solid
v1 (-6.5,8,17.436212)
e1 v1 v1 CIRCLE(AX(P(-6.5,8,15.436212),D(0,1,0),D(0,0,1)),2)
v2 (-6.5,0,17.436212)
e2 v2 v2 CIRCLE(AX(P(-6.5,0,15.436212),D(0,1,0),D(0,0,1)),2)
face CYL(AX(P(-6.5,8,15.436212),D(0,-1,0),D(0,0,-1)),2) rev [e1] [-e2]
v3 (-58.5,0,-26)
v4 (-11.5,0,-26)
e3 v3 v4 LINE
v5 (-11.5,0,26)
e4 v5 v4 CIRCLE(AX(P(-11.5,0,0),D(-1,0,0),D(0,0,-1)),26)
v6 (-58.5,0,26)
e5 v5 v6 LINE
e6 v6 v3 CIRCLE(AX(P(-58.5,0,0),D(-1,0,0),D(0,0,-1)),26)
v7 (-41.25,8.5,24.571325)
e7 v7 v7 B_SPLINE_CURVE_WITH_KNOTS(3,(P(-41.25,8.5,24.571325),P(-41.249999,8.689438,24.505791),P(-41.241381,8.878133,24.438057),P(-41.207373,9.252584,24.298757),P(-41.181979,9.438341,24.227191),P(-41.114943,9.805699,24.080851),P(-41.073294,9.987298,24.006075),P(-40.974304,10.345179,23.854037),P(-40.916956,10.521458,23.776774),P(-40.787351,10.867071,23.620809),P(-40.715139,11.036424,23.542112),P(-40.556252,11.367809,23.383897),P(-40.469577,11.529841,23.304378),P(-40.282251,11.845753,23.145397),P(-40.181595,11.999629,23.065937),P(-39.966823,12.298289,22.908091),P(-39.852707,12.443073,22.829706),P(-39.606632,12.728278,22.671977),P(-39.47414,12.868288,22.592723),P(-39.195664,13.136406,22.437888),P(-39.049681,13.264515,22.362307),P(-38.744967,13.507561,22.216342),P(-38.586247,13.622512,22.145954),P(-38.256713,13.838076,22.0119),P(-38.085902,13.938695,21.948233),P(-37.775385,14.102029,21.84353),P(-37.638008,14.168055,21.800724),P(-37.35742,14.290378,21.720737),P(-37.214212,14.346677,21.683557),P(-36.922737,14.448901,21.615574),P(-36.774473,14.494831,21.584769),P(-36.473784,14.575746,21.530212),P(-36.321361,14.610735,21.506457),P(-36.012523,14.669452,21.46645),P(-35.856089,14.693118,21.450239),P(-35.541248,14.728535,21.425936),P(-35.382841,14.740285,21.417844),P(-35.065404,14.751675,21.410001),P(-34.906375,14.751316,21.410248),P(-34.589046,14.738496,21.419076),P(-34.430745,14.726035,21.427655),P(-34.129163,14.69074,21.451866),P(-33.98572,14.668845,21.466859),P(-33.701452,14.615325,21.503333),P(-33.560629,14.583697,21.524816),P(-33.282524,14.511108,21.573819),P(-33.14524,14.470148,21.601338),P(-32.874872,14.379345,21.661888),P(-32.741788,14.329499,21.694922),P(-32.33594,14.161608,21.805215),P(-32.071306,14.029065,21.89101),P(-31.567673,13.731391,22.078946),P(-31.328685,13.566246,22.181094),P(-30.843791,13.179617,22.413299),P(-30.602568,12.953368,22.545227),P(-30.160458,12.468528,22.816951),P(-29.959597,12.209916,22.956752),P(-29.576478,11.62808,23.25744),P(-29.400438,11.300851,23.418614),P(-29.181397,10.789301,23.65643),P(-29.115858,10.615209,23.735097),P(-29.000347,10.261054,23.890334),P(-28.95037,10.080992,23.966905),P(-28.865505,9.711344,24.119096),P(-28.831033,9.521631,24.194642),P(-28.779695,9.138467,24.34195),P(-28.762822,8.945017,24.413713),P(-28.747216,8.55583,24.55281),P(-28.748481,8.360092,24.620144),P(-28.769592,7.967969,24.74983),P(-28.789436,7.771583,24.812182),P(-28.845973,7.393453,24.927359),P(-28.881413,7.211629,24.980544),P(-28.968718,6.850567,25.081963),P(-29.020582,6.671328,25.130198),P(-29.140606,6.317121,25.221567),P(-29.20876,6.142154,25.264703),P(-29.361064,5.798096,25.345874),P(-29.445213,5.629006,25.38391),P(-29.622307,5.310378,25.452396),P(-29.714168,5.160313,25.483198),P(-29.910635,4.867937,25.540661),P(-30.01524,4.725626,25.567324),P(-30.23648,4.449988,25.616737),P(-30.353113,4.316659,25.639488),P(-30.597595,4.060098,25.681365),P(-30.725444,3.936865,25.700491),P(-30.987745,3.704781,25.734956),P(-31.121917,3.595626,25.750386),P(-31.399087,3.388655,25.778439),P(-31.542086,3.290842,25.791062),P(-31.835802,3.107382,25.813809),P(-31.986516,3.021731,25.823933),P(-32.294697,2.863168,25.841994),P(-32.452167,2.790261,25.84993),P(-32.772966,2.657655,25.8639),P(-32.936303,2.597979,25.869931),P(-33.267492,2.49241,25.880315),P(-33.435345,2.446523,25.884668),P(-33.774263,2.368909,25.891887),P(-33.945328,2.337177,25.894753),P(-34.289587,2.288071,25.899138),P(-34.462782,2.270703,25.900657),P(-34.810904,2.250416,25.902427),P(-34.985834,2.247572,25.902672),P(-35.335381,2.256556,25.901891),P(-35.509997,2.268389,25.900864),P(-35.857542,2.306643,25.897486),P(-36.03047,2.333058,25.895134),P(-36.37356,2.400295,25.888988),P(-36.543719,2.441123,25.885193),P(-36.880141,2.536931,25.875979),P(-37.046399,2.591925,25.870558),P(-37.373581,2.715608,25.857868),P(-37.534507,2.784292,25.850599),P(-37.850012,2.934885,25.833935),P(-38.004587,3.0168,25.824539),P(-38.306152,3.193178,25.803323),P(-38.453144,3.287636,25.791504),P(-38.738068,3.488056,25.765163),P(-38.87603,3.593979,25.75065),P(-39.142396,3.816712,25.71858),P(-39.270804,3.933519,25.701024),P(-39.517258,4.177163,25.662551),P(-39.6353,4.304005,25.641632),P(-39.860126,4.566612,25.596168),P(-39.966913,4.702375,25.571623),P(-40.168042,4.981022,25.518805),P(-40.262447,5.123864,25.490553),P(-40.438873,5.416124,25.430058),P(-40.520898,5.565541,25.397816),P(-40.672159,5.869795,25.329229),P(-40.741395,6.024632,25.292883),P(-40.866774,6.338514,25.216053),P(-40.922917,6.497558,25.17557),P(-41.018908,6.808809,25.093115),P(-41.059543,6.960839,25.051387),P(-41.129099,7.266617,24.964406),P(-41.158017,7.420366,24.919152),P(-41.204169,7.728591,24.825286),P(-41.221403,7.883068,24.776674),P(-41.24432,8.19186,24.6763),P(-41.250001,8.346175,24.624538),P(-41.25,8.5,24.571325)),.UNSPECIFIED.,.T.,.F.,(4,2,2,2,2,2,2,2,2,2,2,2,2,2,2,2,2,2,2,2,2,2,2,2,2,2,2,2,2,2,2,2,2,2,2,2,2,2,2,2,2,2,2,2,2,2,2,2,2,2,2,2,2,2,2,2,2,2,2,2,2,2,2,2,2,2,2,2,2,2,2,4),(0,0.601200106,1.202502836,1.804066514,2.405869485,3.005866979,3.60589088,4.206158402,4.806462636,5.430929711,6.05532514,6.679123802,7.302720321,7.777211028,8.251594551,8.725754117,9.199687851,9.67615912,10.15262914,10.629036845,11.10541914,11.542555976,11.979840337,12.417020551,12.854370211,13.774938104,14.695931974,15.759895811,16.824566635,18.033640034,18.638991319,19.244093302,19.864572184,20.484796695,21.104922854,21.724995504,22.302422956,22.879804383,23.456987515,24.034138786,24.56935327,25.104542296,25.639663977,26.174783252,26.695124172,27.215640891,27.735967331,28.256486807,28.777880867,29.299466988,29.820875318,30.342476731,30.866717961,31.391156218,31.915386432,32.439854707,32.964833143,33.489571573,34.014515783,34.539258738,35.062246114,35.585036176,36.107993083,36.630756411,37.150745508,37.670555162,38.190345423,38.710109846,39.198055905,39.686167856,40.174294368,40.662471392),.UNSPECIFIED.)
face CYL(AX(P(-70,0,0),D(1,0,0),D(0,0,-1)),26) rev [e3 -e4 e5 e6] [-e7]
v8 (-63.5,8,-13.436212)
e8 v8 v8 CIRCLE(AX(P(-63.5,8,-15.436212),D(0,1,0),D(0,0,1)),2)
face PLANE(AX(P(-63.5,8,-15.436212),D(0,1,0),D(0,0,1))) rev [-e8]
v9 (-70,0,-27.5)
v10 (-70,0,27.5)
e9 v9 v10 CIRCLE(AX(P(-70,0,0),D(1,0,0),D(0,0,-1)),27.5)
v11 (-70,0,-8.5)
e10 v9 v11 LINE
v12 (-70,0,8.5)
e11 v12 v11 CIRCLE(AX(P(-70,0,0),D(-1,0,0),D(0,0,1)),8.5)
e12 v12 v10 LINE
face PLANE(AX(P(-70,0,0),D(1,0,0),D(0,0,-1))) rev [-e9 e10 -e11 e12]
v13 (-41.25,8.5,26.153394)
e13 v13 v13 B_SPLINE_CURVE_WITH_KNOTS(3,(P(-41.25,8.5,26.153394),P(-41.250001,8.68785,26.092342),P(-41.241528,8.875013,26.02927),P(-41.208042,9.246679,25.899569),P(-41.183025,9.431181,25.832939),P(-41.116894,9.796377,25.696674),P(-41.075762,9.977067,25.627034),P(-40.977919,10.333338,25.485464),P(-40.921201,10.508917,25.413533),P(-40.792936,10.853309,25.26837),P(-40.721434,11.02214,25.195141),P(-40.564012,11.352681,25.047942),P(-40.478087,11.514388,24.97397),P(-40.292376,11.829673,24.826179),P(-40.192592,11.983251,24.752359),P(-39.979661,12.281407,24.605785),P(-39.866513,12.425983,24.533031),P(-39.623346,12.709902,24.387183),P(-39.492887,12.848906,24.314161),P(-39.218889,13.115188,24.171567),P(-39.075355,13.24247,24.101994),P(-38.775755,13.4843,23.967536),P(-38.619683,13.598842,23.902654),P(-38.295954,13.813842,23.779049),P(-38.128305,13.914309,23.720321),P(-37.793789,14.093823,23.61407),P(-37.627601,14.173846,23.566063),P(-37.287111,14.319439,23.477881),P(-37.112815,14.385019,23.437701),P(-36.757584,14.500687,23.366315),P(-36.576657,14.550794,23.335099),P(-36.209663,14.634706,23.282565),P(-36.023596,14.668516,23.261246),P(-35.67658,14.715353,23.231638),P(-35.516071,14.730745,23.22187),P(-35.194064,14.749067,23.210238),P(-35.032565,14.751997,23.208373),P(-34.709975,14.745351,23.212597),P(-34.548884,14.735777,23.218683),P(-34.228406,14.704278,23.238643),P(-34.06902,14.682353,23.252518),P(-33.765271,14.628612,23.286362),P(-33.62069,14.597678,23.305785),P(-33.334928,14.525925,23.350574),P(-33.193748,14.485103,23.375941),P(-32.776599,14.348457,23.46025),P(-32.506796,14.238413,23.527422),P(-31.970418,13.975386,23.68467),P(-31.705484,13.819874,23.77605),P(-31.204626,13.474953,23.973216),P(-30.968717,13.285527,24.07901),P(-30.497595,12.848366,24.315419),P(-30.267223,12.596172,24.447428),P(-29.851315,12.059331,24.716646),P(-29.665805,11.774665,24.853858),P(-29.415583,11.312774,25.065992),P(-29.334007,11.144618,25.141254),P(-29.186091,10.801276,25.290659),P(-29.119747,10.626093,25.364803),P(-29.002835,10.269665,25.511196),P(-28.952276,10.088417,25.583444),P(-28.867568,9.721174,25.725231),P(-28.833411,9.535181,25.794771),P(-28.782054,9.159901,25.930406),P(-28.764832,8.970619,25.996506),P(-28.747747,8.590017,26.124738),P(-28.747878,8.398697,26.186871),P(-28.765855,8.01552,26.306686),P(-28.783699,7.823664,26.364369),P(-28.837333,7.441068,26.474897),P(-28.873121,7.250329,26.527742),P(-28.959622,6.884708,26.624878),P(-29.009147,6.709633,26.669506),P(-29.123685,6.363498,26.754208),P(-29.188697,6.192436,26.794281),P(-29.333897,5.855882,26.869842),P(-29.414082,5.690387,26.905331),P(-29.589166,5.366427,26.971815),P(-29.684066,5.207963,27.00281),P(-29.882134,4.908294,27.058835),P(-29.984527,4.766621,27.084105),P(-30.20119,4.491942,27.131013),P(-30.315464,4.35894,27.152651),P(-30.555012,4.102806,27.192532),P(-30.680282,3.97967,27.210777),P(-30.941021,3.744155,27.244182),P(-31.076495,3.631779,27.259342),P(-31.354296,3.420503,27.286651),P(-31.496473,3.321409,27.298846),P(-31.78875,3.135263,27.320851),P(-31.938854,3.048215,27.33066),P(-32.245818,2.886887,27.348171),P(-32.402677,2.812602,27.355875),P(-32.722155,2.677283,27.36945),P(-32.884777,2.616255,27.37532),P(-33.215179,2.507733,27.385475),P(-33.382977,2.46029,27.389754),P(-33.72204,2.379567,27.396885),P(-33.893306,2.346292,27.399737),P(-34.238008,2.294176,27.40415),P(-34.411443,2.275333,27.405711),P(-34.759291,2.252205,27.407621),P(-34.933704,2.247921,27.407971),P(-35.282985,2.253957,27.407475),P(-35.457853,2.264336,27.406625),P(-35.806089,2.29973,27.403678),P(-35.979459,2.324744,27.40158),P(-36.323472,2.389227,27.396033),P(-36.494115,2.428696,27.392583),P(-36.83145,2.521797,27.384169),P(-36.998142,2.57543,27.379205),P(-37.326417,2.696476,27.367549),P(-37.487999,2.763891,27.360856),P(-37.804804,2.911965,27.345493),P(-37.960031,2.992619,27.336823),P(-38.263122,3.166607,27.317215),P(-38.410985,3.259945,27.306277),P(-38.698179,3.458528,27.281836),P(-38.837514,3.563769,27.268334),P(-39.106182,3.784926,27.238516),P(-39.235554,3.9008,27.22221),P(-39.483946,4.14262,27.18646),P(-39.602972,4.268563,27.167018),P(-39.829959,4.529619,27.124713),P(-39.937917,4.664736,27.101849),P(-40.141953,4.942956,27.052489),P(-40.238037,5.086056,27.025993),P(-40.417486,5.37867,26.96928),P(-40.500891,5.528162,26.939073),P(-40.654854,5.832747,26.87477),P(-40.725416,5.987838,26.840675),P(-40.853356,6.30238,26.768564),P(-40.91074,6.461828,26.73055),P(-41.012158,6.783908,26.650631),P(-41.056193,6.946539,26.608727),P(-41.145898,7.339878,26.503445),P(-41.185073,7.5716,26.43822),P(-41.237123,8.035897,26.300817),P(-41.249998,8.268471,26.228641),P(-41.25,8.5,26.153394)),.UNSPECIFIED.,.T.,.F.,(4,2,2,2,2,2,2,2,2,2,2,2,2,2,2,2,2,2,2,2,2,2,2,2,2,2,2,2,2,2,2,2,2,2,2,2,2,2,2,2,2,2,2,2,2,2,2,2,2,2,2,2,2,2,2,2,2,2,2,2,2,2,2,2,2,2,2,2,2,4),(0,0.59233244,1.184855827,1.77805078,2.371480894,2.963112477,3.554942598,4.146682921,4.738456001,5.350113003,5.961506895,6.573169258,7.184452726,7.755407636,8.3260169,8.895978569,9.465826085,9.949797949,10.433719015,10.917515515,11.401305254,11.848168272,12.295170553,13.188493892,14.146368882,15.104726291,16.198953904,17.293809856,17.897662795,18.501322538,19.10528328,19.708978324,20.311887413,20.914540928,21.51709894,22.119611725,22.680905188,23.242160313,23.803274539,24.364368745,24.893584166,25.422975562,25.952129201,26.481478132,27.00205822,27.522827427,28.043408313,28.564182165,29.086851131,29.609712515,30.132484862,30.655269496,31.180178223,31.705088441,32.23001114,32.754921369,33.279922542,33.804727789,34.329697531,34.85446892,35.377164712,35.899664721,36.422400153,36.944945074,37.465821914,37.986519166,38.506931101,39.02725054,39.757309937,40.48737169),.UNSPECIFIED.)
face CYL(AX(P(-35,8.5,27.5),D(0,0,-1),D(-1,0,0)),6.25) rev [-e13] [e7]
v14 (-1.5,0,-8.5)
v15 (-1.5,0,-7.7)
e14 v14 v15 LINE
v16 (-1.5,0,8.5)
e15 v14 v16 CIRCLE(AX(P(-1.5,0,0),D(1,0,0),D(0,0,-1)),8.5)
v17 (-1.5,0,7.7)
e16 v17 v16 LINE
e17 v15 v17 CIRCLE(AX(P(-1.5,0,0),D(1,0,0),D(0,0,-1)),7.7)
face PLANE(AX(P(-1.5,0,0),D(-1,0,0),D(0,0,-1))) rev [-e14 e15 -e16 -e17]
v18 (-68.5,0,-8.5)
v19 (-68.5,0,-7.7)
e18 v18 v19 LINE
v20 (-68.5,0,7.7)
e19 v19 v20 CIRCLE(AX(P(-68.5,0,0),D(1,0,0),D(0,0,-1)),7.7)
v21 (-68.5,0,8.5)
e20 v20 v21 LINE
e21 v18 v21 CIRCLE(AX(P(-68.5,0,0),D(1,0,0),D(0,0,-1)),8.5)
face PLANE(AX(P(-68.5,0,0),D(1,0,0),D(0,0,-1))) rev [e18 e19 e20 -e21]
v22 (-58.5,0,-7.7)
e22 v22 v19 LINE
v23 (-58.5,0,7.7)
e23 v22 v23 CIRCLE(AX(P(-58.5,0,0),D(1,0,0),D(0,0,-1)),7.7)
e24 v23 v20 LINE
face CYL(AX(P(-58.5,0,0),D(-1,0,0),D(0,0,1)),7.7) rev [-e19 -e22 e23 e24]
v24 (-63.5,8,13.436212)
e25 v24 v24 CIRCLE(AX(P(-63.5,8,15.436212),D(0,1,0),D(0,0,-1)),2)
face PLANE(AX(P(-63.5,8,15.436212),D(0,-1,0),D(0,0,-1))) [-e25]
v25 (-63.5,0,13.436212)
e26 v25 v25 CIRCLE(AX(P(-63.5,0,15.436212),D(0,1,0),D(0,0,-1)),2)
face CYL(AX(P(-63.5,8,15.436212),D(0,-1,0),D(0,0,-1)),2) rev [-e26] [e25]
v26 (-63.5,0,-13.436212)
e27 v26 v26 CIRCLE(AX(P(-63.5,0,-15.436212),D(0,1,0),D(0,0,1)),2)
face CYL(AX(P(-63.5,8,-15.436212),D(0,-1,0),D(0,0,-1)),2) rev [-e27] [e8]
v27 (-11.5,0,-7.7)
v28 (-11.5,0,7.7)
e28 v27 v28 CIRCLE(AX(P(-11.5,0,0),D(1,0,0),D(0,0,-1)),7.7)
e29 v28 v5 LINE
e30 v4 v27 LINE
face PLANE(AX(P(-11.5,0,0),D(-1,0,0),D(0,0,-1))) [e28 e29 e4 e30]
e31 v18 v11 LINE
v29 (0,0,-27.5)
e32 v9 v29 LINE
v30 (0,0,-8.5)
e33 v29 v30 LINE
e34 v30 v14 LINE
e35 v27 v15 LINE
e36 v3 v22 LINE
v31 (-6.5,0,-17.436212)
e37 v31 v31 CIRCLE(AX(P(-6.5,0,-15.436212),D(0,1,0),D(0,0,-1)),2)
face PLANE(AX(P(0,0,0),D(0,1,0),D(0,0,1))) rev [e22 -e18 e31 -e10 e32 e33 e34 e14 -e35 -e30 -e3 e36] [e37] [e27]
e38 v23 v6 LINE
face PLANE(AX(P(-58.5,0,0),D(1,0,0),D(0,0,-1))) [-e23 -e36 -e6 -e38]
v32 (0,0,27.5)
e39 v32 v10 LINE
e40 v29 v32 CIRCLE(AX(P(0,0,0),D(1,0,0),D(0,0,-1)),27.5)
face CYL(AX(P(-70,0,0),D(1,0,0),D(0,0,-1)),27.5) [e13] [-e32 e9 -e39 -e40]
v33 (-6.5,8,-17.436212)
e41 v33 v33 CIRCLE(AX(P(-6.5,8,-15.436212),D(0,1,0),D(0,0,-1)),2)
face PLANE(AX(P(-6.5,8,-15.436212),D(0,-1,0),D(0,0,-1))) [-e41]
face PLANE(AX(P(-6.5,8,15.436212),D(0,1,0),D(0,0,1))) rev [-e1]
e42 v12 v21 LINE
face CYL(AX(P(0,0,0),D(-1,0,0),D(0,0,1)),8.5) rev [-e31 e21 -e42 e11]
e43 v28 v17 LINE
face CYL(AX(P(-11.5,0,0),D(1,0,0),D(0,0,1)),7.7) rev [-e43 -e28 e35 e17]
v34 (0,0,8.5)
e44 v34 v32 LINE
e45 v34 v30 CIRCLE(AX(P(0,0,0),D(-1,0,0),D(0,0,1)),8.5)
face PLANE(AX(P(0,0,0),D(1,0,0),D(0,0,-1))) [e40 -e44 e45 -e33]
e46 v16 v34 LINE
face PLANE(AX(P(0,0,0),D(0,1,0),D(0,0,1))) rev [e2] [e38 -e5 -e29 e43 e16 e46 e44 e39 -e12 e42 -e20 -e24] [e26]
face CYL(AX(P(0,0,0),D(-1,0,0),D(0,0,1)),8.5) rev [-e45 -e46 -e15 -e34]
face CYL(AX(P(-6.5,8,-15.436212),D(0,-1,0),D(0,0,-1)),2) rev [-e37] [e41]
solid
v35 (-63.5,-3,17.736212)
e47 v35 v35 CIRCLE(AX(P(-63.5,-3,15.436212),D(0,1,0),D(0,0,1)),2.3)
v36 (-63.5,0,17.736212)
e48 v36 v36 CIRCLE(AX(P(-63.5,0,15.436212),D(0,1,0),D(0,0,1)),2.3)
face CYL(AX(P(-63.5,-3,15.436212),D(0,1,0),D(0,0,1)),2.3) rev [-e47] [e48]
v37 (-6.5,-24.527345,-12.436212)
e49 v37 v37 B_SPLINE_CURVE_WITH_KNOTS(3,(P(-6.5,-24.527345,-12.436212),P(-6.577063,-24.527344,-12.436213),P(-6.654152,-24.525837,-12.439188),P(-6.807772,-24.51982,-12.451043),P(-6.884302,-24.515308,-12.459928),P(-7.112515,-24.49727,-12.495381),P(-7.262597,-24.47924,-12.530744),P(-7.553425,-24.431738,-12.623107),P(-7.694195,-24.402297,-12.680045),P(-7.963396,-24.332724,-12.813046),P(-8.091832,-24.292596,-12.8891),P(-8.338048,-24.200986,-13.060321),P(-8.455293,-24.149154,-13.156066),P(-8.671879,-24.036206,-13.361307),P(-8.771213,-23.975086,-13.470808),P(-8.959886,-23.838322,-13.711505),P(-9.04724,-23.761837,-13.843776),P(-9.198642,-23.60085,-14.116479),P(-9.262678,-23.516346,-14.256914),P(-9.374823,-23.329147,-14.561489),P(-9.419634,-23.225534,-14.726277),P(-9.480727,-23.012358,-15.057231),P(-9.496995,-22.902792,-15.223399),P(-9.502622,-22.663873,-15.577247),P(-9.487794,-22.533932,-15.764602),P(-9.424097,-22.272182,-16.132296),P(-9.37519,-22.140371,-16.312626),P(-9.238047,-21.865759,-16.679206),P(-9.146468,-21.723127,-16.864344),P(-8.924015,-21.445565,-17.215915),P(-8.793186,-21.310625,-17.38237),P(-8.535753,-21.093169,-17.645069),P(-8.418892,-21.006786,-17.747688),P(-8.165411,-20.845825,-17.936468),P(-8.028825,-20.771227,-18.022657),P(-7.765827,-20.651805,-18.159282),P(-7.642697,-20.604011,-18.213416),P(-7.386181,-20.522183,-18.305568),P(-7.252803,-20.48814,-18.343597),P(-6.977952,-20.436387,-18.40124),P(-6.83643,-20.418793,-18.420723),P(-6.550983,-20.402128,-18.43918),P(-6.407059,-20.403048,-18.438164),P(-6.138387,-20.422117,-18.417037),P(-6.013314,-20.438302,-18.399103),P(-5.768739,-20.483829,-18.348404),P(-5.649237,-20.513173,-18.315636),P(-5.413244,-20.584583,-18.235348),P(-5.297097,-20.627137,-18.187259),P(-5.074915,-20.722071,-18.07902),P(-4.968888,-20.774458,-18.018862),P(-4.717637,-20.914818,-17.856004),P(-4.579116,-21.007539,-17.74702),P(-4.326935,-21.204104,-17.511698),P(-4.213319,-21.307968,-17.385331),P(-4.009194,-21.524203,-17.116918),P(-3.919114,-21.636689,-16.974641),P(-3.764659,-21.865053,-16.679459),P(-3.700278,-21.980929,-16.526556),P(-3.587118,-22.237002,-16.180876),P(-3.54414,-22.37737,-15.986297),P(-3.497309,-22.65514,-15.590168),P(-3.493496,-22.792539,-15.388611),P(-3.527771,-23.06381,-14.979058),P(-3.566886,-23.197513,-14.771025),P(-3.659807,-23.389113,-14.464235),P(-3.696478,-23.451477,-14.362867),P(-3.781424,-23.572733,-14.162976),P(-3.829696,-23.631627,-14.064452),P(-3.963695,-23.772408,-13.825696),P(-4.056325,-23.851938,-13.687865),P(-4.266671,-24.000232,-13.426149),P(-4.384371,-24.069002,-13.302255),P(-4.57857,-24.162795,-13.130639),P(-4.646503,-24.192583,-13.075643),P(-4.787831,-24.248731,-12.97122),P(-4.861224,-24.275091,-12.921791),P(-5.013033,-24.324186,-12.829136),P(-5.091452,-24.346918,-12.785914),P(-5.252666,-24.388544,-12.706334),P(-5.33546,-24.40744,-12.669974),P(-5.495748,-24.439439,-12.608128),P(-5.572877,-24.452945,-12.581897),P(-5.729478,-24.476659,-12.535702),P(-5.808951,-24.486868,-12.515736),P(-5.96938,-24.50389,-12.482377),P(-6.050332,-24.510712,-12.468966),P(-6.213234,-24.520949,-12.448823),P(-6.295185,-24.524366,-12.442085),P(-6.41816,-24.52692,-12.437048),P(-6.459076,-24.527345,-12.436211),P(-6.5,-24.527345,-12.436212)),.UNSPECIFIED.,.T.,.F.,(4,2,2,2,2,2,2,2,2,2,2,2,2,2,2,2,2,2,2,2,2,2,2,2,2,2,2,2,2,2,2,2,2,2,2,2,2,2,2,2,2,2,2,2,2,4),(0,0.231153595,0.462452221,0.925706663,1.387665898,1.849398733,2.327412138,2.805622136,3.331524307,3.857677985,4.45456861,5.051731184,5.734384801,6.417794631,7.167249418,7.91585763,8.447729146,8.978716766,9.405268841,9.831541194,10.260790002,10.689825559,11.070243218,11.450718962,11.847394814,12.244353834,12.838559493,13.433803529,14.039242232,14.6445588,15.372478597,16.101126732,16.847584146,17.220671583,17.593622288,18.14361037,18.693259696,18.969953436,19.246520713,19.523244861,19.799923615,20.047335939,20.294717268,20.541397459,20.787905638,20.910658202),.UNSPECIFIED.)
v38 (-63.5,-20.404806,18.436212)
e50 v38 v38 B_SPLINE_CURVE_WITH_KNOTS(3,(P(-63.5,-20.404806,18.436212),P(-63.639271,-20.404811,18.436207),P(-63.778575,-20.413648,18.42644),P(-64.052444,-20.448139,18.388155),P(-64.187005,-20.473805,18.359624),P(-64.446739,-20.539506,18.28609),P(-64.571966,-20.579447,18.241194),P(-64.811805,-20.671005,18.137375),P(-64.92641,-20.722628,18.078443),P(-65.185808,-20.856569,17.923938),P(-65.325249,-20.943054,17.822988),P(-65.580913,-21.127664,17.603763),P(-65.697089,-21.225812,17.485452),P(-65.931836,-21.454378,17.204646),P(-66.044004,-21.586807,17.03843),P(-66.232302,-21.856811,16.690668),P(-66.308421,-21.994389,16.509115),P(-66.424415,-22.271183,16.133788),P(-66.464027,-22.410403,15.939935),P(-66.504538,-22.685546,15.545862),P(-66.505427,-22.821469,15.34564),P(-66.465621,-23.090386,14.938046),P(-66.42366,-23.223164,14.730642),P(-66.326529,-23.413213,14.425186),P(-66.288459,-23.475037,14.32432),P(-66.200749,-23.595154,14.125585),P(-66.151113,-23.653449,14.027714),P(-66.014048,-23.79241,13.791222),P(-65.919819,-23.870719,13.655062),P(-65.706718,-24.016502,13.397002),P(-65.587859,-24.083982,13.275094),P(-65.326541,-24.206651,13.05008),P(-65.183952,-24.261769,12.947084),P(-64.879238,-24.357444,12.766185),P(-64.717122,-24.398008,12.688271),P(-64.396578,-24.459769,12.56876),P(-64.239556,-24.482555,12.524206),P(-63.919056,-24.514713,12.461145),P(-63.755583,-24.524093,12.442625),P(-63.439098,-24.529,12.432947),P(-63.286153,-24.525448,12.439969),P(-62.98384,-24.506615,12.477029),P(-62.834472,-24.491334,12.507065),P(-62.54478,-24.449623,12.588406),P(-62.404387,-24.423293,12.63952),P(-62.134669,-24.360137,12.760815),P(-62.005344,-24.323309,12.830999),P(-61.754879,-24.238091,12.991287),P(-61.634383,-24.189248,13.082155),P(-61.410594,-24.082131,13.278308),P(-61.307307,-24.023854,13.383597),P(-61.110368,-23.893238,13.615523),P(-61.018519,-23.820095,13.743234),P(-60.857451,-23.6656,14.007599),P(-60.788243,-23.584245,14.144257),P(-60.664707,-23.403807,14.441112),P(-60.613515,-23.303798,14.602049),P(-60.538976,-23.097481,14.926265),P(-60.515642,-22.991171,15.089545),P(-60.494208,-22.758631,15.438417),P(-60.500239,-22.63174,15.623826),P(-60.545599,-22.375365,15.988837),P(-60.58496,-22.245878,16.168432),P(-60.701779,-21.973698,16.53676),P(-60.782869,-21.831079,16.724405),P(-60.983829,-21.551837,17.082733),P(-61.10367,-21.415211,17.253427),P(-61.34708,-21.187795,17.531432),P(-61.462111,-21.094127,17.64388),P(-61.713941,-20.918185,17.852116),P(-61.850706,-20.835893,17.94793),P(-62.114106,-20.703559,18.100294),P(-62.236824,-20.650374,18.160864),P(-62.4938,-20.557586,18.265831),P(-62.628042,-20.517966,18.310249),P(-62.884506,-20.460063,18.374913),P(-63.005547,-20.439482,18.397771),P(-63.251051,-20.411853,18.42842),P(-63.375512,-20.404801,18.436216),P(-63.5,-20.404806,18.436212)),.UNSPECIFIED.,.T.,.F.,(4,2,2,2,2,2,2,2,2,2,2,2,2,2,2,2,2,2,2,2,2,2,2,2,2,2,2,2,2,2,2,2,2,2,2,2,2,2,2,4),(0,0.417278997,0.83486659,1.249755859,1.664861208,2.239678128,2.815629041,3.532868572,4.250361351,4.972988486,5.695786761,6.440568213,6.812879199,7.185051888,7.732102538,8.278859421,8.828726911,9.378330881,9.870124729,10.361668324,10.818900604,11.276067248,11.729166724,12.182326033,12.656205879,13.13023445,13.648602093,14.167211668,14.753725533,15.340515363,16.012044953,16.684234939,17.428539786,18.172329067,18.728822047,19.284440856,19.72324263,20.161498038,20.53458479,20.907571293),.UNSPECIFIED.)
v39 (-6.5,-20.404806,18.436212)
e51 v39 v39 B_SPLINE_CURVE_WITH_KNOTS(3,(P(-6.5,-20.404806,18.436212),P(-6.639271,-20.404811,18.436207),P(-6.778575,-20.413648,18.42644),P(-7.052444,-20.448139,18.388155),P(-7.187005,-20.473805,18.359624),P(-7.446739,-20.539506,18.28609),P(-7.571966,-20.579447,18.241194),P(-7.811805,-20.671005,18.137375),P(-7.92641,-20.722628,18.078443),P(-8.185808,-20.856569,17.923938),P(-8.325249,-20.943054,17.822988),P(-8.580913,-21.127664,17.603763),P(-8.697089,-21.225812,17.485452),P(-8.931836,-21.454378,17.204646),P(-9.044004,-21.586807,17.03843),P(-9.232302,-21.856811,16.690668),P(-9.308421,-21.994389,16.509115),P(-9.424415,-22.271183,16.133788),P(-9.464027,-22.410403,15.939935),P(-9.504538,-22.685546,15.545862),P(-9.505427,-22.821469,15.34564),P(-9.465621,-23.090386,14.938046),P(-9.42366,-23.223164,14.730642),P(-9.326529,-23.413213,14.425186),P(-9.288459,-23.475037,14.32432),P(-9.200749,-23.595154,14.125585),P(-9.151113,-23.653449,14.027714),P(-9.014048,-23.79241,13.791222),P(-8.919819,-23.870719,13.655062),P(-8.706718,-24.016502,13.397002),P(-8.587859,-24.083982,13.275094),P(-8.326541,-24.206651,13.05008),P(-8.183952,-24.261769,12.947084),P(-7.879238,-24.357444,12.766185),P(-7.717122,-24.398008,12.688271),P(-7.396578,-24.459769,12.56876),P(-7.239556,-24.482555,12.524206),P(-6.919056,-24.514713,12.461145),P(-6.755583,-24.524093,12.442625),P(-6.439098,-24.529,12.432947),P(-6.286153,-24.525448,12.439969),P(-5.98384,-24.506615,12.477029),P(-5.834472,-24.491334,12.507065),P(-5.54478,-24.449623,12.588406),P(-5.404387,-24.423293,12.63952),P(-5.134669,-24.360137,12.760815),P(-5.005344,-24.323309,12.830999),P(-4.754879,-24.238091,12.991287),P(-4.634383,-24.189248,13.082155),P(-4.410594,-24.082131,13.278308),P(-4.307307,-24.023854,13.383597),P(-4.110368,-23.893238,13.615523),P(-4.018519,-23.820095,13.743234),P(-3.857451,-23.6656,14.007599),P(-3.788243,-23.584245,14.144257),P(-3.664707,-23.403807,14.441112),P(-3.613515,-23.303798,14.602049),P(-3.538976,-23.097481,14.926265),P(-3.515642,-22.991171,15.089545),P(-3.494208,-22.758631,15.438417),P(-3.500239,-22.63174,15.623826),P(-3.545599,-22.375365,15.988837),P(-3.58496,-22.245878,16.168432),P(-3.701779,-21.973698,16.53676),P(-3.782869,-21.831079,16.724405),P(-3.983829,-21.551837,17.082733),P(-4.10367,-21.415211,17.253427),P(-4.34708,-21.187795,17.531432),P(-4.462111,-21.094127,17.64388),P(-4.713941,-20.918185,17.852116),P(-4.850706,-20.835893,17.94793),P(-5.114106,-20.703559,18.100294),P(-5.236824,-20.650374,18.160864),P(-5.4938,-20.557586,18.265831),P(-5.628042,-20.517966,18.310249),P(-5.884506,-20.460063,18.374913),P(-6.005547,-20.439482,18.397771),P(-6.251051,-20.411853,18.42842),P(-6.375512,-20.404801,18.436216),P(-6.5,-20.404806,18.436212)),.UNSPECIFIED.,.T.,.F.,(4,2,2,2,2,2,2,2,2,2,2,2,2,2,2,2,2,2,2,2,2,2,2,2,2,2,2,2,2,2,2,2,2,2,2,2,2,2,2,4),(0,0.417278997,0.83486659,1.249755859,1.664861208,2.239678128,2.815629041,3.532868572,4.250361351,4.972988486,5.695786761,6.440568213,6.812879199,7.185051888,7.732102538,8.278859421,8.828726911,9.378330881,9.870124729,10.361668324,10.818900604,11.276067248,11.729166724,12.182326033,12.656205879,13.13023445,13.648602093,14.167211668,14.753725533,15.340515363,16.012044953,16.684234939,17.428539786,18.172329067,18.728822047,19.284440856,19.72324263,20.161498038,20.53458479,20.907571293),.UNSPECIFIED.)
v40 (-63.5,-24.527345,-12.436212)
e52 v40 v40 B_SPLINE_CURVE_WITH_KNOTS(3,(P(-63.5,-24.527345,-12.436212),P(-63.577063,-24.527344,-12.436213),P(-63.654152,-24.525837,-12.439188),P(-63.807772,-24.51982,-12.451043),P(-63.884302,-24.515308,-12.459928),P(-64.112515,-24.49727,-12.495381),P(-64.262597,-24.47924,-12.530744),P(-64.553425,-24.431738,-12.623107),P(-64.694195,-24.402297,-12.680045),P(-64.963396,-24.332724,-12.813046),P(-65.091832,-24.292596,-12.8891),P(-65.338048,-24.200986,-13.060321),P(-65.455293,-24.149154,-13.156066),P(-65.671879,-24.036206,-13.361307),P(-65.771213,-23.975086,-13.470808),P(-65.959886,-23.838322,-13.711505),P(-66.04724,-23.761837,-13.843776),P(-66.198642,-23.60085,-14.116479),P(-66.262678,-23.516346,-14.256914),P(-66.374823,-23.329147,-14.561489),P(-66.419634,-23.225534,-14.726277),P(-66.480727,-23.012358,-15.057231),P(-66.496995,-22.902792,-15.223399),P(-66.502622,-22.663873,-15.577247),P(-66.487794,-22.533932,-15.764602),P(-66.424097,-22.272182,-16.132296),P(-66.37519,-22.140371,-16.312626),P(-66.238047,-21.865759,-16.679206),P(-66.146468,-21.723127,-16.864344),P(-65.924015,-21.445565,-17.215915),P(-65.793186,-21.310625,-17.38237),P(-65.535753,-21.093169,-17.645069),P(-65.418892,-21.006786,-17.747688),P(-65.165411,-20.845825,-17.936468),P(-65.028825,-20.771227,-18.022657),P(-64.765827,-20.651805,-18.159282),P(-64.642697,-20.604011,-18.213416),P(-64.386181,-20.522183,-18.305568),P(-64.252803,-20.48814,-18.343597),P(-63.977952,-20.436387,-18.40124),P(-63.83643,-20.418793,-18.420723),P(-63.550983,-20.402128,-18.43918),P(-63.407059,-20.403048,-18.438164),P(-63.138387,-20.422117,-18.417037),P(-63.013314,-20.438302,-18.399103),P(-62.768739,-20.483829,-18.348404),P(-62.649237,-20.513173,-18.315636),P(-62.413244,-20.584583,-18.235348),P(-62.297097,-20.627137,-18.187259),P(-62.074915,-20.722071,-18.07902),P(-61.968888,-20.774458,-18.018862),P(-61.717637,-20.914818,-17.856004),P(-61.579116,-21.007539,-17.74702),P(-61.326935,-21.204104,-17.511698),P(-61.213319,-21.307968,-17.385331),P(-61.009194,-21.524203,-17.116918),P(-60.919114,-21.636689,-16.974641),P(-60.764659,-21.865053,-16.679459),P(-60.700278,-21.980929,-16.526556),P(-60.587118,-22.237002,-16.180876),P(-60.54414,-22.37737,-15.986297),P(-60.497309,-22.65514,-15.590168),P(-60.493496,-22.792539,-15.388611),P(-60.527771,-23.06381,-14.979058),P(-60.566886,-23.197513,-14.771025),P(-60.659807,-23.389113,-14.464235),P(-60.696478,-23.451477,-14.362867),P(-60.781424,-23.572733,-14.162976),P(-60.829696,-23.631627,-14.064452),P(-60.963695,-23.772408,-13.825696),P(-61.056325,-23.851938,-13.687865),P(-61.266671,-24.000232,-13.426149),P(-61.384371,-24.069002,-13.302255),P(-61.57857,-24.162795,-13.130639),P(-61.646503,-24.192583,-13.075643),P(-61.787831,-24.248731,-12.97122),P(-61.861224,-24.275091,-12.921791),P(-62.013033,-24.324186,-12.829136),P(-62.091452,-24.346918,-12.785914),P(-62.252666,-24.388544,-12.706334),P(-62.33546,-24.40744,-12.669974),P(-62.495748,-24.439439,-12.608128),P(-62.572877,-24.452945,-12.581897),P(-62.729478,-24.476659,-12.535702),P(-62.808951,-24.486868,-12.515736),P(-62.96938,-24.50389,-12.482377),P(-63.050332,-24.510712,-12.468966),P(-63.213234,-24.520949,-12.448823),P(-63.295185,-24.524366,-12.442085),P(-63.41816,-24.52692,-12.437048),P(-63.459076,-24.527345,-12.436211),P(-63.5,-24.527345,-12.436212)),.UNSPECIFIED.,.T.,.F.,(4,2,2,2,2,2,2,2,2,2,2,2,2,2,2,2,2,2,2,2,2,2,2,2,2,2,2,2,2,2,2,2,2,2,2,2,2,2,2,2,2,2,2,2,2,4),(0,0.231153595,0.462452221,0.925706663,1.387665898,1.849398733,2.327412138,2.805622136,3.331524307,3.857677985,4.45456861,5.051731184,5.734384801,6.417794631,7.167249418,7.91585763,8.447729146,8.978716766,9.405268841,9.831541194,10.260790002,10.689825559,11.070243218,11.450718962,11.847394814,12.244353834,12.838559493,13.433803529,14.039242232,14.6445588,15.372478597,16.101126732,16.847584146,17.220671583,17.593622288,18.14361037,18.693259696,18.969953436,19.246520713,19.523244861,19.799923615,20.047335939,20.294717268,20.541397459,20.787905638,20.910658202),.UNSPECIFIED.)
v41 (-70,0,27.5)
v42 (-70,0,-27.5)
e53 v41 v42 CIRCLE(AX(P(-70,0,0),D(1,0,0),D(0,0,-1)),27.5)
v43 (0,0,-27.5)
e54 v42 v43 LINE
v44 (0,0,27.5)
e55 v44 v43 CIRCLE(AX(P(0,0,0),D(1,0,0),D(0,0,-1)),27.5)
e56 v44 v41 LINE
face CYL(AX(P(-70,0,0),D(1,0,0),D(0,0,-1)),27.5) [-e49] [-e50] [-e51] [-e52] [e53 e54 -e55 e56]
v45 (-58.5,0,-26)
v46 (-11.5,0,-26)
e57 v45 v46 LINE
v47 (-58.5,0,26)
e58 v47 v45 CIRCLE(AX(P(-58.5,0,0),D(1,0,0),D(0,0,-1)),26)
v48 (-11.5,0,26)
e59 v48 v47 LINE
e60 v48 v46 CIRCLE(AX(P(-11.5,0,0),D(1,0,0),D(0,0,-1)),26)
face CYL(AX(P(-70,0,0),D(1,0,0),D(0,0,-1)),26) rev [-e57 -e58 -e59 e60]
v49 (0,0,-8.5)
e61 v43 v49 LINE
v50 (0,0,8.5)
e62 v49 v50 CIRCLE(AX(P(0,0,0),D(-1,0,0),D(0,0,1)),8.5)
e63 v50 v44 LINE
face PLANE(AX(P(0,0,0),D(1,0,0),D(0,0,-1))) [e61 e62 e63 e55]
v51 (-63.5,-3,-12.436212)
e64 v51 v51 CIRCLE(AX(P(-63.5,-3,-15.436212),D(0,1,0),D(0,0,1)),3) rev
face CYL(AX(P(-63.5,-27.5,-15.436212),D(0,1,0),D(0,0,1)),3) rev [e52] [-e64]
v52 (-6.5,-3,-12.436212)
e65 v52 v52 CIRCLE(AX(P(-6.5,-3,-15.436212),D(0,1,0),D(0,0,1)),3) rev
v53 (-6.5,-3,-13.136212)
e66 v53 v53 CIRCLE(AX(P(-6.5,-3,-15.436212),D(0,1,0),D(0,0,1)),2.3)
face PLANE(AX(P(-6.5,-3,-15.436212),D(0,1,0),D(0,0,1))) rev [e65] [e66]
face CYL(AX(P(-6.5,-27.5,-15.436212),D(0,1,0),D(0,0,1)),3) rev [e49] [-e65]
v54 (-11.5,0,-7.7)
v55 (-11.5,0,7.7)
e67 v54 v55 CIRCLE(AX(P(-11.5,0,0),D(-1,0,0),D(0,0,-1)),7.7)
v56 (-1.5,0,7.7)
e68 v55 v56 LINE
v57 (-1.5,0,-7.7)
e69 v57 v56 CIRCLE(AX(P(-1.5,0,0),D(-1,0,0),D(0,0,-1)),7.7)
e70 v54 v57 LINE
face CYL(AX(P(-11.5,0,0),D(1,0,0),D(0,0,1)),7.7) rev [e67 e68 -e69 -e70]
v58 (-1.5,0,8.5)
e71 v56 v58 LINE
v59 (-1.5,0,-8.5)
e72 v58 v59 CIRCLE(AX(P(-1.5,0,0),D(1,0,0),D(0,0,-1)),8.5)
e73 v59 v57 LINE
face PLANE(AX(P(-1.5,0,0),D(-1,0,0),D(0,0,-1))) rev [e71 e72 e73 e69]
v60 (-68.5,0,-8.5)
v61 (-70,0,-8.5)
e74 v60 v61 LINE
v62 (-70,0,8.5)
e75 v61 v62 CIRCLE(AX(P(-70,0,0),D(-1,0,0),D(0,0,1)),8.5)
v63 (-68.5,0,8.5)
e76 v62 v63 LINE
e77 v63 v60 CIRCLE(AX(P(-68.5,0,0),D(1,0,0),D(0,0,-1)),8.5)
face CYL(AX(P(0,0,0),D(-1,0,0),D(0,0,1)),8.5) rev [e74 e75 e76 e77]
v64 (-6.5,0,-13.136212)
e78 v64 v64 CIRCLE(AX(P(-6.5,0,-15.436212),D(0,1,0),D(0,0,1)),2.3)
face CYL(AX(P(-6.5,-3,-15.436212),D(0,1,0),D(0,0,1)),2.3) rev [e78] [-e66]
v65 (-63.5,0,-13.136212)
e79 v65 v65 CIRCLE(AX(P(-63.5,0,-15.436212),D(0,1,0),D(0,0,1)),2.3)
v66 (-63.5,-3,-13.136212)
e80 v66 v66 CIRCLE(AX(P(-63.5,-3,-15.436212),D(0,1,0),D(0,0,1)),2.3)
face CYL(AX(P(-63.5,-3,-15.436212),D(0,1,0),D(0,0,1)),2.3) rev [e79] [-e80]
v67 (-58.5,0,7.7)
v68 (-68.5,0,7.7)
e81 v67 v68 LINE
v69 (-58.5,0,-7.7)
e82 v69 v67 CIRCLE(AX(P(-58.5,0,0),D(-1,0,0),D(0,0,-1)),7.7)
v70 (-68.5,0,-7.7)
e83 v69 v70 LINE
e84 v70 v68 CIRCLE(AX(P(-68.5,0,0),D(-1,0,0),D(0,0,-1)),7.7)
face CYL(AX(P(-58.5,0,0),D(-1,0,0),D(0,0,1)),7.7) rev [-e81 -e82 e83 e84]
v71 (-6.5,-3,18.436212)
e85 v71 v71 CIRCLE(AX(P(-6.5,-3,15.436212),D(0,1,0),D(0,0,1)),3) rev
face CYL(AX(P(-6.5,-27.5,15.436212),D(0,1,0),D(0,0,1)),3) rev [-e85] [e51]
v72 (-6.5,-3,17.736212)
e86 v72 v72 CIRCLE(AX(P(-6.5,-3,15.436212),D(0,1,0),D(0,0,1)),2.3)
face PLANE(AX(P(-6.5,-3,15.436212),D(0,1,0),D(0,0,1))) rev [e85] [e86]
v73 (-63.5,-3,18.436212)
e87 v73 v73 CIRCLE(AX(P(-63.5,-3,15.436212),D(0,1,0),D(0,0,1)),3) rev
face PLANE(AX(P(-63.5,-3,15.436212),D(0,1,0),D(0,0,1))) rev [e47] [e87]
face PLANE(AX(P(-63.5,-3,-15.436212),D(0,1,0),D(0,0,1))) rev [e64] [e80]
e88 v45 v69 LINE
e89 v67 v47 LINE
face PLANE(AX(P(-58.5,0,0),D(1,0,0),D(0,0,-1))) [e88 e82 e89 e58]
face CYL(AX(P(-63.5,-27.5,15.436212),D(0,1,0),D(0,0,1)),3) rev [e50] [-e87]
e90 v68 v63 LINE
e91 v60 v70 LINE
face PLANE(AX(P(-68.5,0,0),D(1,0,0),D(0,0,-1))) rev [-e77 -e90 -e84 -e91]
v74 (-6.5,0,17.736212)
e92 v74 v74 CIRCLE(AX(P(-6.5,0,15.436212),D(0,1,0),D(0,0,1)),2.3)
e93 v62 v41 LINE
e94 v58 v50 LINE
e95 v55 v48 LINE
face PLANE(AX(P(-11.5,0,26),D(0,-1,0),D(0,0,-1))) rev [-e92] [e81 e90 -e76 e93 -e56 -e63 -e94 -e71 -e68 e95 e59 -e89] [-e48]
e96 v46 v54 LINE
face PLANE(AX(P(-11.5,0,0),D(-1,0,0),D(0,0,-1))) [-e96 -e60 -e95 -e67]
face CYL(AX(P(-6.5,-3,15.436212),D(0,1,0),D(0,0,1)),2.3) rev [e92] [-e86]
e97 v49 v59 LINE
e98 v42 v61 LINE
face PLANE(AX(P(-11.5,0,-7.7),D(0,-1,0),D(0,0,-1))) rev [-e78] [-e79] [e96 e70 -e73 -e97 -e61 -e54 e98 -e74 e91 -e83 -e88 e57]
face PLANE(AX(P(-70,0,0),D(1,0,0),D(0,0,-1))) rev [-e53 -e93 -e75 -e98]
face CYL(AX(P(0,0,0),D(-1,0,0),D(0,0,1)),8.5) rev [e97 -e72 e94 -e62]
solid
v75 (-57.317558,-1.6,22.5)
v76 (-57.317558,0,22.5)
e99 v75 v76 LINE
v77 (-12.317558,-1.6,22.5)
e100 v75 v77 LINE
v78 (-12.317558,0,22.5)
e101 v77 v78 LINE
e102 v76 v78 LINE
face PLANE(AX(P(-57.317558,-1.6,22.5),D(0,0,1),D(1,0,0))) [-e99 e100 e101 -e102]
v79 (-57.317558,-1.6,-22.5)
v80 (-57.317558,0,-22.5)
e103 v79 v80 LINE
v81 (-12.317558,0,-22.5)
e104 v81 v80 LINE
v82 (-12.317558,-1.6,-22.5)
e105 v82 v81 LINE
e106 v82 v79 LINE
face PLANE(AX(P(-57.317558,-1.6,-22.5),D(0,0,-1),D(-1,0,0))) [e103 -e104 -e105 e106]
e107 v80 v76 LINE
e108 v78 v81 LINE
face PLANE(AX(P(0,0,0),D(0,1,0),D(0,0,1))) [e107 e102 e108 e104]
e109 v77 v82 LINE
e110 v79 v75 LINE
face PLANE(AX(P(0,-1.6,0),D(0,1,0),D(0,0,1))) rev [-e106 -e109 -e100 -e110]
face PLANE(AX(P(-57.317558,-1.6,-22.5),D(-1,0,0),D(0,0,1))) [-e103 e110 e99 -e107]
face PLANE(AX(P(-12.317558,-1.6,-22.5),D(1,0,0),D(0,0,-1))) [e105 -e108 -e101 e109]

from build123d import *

# Parameters (mm, degrees)
SKETCH1_R           = 27.5
BOSS_EXTRUDE1_DEPTH = 70
SHELL1_T            = -1.5
SHELL2_T            = -1.5
SKETCH2_R           = 8.5
CUT_EXTRUDE1_DEPTH  = 81.07808689
BOSS_EXTRUDE2_DEPTH = 10
SKETCH5_W           = 45
SKETCH5_H           = 45
BOSS_EXTRUDE3_DEPTH = 1.6
MIRROR6_START       = -68.5
MIRROR6_DEPTH       = 10
MIRROR6_START_2     = -11.5
MIRROR6_2_DEPTH     = 10
SKETCH6_R           = 2
CUT_EXTRUDE2_DEPTH  = 8
SKETCH7_R           = 3
CUT_EXTRUDE3_DEPTH  = 81.07808689
SKETCH8_R           = 3
SKETCH8_R_2         = 2.3
BOSS_EXTRUDE4_DEPTH = 3
SKETCH9_R           = 6.25
CUT_EXTRUDE4_DEPTH  = 81.078087046


with BuildPart() as part:
    # Sketch1 → Boss-Extrude1 (new body)
    with BuildSketch(Plane(origin=(0, 0, 0), x_dir=(0, 0, -1), z_dir=(1, 0, 0))):
        Circle(SKETCH1_R)
    extrude(amount=-BOSS_EXTRUDE1_DEPTH)


with BuildPart() as body_2:
    # Split1: the piece on the far side of the plane
    add(part.part)
    split(bisect_by=Plane.ZX, keep=Keep.BOTTOM)

    # Shell1
    shell1_openings = [body_2.faces().sort_by_distance(p)[0] for p in [
        (-35, 0, 0),
    ]]
    offset(amount=SHELL1_T, openings=shell1_openings)


with BuildPart() as part_1:
    add(part.part)

    # Split1
    split(bisect_by=Plane.ZX, keep=Keep.TOP)

    # Shell2
    shell2_openings = [part_1.faces().sort_by_distance(p)[0] for p in [
        (-35, 0, 0),
    ]]
    offset(amount=SHELL2_T, openings=shell2_openings)


with BuildPart() as cut_extrude1_tool:
    # Sketch2 → Cut-Extrude1 (new, through all)
    with BuildSketch(Plane.ZY.offset(70)):
        Circle(SKETCH2_R)
    extrude(amount=-CUT_EXTRUDE1_DEPTH)


with BuildPart() as part_2:
    add(part_1.part)

    # Cut-Extrude1: cut by cut_extrude1_tool
    add(cut_extrude1_tool.part, mode=Mode.SUBTRACT)

    # Mirror6: read off the stored shape, not the designer's step
    # Mirror6 outline → Mirror6 (add)
    with BuildSketch(Plane.YZ.offset(MIRROR6_START)):
        with BuildLine():
            Line((0, -7.7), (0, -26))
            ThreePointArc((0, -26), (26, 0), (0, 26))
            Line((0, 26), (0, 7.7))
            ThreePointArc((0, 7.7), (7.7, 0), (0, -7.7))
        make_face()
    extrude(amount=MIRROR6_DEPTH)

    # Mirror6 2 outline → Mirror6 2 (add)
    with BuildSketch(Plane.YZ.offset(MIRROR6_START_2)):
        with BuildLine():
            Line((0, -7.7), (0, -26))
            ThreePointArc((0, -26), (26, 0), (0, 26))
            Line((0, 26), (0, 7.7))
            ThreePointArc((0, 7.7), (7.7, 0), (0, -7.7))
        make_face()
    extrude(amount=MIRROR6_2_DEPTH)

    # Sketch6 → Cut-Extrude2 (cut)
    with BuildSketch(Plane(origin=(0, 0, 0), x_dir=(1, 0, 0), z_dir=(0, 1, 0))):
        with Locations(Location((-63.5, 15.436211609, 0), (0, 0, 270))):
            Circle(SKETCH6_R)
        with Locations(Location((-6.5, 15.436211609, 0), (0, 0, 90))):
            Circle(SKETCH6_R)
        with Locations(Location((-63.5, -15.436211609, 0), (0, 0, 90))):
            Circle(SKETCH6_R)
        with Locations(Location((-6.5, -15.436211609, 0), (0, 0, 270))):
            Circle(SKETCH6_R)
    extrude(amount=CUT_EXTRUDE2_DEPTH, mode=Mode.SUBTRACT)

    # Sketch9 → Cut-Extrude4 (cut, through all)
    with BuildSketch(Plane.XY):
        with Locations(Location((-35, 8.5, 0), (0, 0, 180))):
            Circle(SKETCH9_R)
    extrude(amount=CUT_EXTRUDE4_DEPTH, mode=Mode.SUBTRACT)


with BuildPart() as body_2_1:
    add(body_2.part)

    # Cut-Extrude1: cut by cut_extrude1_tool
    add(cut_extrude1_tool.part, mode=Mode.SUBTRACT)


with BuildPart() as body_3:
    # Sketch4 → Boss-Extrude2 (new body)
    with BuildSketch(Plane(origin=(-68.5, 0, 0), x_dir=(0, 0, -1), z_dir=(1, 0, 0))):
        with BuildLine():
            Line((-26, 0), (-7.7, 0))
            ThreePointArc((-7.7, 0), (0, -7.7), (7.7, 0))
            Line((7.7, 0), (26, 0))
            ThreePointArc((26, 0), (0, -26), (-26, 0))
        make_face()
    extrude(amount=BOSS_EXTRUDE2_DEPTH)


with BuildPart() as body_4:
    # Sketch5 → Boss-Extrude3 (new body)
    with BuildSketch(Plane(origin=(0, 0, 0), x_dir=(1, 0, 0), z_dir=(0, 1, 0))):
        with Locations((-34.817558458, 0)):
            Rectangle(SKETCH5_W, SKETCH5_H)
    extrude(amount=-BOSS_EXTRUDE3_DEPTH)


with BuildPart() as body_5:
    # Mirror4: mirrored copy
    add(body_3.part.mirror(Plane.ZY.offset(35)))


with BuildPart() as body_2_2:
    add(body_2_1.part)

    # Combine1: read off the stored shape, not the designer's step
    # Combine1: union body 3, body 5
    add(body_3.part)
    add(body_5.part)

    # Sketch7 → Cut-Extrude3 (cut, through all)
    with BuildSketch(Plane(origin=(0, 0, 0), x_dir=(1, 0, 0), z_dir=(0, 1, 0))):
        with Locations(Location((-63.5, 15.436211609, 0), (0, 0, 270))):
            Circle(SKETCH7_R)
        with Locations(Location((-6.5, 15.436211609, 0), (0, 0, 270))):
            Circle(SKETCH7_R)
        with Locations(Location((-6.5, -15.436211609, 0), (0, 0, 270))):
            Circle(SKETCH7_R)
        with Locations(Location((-63.5, -15.436211609, 0), (0, 0, 270))):
            Circle(SKETCH7_R)
    extrude(amount=-CUT_EXTRUDE3_DEPTH, mode=Mode.SUBTRACT)

    # Sketch8 → Boss-Extrude4 (add)
    # profile 1 of 4: a face of its own
    with BuildSketch(Plane(origin=(0, 0, 0), x_dir=(1, 0, 0), z_dir=(0, 1, 0))):
        with Locations(Location((-63.5, -15.436211609, 0), (0, 0, 270))):
            Circle(SKETCH8_R)
        with Locations(Location((-63.5, -15.436211609, 0), (0, 0, 270))):
            Circle(SKETCH8_R_2, mode=Mode.SUBTRACT)
    # profile 2 of 4: a face of its own
    with BuildSketch(Plane(origin=(0, 0, 0), x_dir=(1, 0, 0), z_dir=(0, 1, 0))):
        with Locations(Location((-6.5, -15.436211609, 0), (0, 0, 270))):
            Circle(SKETCH8_R)
        with Locations(Location((-6.5, -15.436211609, 0), (0, 0, 270))):
            Circle(SKETCH8_R_2, mode=Mode.SUBTRACT)
    # profile 3 of 4: a face of its own
    with BuildSketch(Plane(origin=(0, 0, 0), x_dir=(1, 0, 0), z_dir=(0, 1, 0))):
        with Locations(Location((-6.5, 15.436211609, 0), (0, 0, 270))):
            Circle(SKETCH8_R)
        with Locations(Location((-6.5, 15.436211609, 0), (0, 0, 270))):
            Circle(SKETCH8_R_2, mode=Mode.SUBTRACT)
    # profile 4 of 4: a face of its own
    with BuildSketch(Plane(origin=(0, 0, 0), x_dir=(1, 0, 0), z_dir=(0, 1, 0))):
        with Locations(Location((-63.5, 15.436211609, 0), (0, 0, 270))):
            Circle(SKETCH8_R)
        with Locations(Location((-63.5, 15.436211609, 0), (0, 0, 270))):
            Circle(SKETCH8_R_2, mode=Mode.SUBTRACT)
    extrude(amount=-BOSS_EXTRUDE4_DEPTH)


solid = Compound([part_2.part, body_4.part, body_2_2.part])
